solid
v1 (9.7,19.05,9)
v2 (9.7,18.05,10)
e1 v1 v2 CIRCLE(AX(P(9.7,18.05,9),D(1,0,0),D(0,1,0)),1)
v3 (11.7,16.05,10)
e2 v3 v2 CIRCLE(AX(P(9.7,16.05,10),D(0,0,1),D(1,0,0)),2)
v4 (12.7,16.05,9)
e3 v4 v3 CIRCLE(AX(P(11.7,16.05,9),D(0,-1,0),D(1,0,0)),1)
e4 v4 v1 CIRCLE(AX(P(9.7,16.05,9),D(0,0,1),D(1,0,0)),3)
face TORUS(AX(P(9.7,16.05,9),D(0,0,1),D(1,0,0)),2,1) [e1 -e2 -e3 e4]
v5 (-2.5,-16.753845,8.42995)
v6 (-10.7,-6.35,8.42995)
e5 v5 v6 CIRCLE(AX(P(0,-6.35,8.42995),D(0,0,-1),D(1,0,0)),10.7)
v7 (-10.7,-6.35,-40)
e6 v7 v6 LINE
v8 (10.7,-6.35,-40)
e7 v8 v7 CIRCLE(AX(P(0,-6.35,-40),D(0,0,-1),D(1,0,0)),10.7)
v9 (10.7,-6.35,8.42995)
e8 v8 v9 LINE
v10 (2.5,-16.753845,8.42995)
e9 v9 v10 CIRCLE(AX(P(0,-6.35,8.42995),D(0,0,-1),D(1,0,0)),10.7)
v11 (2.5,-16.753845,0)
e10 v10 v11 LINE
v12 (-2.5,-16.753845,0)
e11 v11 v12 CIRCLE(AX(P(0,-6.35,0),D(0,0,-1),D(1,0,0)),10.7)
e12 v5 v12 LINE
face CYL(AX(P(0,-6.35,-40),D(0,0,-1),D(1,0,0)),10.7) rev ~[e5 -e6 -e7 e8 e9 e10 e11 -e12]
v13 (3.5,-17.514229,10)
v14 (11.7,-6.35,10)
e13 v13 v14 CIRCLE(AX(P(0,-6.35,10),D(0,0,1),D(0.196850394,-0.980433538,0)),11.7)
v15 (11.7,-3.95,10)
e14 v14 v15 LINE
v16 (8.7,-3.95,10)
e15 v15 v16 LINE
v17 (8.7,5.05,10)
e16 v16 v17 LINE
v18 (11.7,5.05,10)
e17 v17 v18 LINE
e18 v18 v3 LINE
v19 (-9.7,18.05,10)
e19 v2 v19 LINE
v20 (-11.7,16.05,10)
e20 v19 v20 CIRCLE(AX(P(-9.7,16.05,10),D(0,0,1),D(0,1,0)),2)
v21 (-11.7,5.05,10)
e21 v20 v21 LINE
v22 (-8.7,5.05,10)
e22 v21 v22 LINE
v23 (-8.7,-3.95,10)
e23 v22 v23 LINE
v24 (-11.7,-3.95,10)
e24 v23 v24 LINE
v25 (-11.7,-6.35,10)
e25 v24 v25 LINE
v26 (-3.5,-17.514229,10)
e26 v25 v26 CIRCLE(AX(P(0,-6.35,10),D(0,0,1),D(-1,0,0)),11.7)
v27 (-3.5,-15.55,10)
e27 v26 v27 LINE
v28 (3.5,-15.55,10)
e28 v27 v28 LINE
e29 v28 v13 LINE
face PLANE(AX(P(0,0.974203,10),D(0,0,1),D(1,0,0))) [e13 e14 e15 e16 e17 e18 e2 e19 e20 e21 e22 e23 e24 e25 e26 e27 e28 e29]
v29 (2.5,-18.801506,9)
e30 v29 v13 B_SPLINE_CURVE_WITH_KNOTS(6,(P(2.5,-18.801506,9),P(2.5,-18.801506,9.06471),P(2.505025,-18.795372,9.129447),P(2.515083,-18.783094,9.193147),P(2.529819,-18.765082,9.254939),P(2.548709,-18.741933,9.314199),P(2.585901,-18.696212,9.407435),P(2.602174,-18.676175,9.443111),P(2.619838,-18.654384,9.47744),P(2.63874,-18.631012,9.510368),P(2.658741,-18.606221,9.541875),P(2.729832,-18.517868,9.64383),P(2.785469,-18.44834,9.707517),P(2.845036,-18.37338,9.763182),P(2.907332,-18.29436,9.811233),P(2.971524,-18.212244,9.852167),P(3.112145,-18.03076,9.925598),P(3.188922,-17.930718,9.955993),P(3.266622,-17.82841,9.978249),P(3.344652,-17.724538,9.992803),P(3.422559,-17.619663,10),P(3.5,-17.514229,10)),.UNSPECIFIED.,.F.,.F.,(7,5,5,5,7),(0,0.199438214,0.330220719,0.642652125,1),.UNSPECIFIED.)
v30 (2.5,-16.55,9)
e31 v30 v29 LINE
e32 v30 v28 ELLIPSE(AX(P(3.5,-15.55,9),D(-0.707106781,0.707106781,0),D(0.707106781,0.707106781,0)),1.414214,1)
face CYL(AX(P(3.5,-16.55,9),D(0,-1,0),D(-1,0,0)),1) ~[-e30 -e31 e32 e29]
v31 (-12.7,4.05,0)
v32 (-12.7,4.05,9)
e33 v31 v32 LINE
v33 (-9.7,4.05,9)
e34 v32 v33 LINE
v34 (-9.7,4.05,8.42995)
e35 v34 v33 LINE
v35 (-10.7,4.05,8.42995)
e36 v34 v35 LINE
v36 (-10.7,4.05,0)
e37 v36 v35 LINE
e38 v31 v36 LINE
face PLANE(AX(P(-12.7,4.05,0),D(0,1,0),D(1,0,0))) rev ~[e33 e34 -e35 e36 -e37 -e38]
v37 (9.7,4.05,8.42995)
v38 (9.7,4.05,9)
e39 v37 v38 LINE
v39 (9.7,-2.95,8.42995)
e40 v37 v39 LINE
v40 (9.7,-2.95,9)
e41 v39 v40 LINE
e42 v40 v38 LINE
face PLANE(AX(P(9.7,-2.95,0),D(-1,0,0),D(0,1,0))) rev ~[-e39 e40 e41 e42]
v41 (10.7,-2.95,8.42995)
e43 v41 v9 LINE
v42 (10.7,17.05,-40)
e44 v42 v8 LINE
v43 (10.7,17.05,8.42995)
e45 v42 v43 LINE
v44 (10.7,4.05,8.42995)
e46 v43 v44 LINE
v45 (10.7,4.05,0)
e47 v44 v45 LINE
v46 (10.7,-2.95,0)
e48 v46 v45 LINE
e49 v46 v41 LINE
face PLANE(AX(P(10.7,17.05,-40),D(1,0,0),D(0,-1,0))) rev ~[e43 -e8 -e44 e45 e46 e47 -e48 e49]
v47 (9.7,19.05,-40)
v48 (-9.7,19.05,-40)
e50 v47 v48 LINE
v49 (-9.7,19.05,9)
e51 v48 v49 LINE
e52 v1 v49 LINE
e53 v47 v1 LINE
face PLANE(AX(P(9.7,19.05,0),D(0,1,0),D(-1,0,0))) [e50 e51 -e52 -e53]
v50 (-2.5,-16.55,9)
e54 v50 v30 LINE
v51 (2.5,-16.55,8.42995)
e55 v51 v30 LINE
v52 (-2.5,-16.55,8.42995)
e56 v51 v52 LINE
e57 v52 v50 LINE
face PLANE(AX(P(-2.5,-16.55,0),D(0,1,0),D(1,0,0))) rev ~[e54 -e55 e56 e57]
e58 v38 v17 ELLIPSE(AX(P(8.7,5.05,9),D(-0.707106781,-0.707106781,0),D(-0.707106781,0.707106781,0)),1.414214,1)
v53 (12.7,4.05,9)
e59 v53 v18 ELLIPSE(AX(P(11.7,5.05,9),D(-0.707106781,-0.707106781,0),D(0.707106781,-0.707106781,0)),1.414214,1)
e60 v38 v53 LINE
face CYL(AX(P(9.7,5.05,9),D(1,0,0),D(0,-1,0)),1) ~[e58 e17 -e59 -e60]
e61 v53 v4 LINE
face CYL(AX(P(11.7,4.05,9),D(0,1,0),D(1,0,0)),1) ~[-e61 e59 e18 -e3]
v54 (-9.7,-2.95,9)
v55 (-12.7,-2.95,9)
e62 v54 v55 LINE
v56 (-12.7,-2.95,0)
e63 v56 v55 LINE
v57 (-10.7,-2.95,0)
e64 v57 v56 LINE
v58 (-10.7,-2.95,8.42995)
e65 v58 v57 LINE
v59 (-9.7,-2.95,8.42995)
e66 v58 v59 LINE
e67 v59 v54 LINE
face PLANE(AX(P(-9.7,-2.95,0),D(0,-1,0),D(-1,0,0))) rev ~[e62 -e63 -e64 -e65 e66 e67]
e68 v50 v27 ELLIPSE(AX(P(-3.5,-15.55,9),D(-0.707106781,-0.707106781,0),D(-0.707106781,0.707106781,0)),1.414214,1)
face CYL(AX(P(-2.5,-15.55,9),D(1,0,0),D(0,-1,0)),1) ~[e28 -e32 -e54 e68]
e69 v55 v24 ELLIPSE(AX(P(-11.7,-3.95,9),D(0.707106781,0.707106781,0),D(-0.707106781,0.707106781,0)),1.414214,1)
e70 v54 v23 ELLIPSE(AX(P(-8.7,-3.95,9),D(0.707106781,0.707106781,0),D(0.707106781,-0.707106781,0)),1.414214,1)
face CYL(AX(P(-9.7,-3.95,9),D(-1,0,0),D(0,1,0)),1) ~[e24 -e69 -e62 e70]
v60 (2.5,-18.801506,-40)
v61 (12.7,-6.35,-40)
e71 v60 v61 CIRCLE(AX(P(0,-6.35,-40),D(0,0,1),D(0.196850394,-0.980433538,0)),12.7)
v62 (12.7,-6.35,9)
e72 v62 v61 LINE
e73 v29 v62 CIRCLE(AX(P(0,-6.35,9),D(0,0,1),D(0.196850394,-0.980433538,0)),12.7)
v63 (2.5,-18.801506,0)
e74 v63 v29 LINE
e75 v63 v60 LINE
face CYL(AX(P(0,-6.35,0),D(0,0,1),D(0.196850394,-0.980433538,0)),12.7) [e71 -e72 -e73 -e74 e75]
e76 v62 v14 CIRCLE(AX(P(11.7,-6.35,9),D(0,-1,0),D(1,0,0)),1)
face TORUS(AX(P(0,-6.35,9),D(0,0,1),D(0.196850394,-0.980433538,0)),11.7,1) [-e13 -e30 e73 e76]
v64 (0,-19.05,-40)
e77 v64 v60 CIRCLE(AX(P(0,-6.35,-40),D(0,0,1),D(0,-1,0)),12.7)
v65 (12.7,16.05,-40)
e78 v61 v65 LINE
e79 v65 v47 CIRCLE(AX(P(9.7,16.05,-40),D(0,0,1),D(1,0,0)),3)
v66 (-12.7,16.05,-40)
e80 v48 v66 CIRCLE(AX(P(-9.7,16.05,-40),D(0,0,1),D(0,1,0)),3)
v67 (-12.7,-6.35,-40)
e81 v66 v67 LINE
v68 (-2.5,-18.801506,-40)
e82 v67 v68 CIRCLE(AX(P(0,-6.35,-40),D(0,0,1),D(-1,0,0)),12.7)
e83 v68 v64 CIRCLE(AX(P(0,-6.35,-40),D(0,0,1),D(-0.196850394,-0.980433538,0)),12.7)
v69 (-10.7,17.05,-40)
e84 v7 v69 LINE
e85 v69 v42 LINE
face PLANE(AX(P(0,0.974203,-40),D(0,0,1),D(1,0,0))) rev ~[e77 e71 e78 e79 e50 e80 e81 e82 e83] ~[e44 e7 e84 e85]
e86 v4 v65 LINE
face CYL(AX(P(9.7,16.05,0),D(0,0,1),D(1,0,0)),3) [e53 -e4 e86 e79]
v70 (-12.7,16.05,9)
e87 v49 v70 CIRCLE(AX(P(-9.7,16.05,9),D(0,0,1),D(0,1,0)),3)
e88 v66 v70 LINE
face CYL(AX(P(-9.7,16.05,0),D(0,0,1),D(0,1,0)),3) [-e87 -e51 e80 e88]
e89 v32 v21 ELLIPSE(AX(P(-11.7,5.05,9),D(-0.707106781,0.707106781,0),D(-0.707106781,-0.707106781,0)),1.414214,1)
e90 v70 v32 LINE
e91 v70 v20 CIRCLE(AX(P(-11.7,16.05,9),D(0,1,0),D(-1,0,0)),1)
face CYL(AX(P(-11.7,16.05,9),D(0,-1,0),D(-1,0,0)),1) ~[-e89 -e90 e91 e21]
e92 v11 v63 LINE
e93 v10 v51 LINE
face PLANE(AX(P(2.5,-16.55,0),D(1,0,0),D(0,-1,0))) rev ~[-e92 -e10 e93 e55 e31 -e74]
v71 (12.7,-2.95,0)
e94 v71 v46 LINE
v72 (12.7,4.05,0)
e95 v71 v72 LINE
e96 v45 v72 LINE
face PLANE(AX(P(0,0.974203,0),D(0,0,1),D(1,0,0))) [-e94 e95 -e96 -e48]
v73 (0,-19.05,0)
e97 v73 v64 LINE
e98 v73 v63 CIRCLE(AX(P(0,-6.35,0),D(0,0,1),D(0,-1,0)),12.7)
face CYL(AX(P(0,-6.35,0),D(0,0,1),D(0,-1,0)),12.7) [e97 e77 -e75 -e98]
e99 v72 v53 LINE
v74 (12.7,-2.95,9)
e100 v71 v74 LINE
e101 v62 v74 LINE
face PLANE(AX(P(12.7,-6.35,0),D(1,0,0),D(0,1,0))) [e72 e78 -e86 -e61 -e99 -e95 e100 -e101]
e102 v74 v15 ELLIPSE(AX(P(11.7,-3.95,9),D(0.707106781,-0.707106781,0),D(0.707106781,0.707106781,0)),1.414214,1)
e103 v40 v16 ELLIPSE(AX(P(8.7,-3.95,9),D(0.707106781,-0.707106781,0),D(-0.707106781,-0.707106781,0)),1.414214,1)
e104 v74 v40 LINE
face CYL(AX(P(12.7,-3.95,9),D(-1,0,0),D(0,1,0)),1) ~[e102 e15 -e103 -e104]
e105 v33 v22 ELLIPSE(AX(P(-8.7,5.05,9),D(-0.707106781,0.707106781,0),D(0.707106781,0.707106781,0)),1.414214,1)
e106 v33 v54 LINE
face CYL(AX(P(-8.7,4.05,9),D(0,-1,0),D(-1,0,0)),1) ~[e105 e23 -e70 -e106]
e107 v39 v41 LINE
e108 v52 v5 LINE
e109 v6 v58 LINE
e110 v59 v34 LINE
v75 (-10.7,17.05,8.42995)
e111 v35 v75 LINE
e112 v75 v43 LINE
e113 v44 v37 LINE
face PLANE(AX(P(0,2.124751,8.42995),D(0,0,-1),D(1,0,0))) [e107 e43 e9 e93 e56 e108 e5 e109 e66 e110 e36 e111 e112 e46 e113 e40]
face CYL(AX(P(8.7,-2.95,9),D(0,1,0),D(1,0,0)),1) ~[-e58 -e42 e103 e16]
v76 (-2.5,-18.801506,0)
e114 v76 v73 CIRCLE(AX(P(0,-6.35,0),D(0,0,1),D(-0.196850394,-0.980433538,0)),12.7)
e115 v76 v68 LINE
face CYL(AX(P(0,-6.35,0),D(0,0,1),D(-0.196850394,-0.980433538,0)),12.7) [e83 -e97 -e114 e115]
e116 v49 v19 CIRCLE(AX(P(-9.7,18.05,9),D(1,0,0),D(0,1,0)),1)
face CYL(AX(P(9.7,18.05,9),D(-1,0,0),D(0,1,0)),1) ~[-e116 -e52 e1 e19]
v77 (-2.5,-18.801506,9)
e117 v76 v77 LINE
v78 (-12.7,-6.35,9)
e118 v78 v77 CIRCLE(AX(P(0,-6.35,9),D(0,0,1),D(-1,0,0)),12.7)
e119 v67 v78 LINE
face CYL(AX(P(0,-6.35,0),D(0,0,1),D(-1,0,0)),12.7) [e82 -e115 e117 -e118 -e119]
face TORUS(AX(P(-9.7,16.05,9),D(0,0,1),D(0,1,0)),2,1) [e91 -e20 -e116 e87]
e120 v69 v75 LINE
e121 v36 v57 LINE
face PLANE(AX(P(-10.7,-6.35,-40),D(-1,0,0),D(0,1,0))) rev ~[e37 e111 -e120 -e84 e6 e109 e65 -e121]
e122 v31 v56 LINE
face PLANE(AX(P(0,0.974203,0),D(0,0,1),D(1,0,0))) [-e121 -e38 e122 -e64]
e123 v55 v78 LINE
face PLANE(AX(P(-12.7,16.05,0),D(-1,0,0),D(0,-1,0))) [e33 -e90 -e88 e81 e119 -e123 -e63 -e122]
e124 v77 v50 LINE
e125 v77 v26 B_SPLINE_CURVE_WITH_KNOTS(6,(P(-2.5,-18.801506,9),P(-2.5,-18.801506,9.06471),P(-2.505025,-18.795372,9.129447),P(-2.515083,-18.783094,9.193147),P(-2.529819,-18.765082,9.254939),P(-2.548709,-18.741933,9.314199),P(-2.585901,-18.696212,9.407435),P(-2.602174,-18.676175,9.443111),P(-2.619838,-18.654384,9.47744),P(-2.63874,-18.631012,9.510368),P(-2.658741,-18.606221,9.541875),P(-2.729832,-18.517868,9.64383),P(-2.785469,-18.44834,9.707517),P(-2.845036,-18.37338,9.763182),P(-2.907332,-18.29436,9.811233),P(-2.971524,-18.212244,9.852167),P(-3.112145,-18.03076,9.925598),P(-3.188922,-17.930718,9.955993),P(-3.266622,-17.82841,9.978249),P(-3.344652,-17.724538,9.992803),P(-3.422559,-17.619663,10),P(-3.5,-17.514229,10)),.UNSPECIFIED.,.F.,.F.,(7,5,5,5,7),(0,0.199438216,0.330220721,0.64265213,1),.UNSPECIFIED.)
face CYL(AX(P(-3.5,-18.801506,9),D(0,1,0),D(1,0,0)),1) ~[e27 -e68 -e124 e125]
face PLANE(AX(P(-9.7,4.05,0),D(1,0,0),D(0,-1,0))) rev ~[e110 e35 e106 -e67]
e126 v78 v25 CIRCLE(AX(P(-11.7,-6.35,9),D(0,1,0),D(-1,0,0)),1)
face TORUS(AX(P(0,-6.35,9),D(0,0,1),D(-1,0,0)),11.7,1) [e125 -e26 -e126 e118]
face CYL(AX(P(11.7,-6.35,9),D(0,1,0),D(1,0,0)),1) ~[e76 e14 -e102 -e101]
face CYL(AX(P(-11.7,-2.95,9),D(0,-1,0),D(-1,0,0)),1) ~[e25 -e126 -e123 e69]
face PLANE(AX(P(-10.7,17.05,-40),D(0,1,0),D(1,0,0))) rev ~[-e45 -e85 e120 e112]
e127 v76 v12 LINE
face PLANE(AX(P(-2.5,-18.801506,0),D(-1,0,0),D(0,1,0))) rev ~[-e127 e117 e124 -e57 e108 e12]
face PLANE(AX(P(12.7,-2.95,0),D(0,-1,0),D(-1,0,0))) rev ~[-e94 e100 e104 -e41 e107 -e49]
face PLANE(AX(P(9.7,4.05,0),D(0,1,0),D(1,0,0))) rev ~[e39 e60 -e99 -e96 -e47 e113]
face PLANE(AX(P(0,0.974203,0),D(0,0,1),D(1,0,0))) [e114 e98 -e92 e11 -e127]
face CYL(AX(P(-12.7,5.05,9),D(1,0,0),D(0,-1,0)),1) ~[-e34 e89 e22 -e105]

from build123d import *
from build123d import SkipClean  # not in build123d's __all__

# Parameters (mm, degrees)
F1_DEPTH = 10
F0_W     = 3
F0_H     = 7
F2_DEPTH = 40
F4_DEPTH = 48.42995
F5_R     = 1


# Not quite as in the source:
# - after a boolean that leaves OpenCascade's solid faulty, fix() repairs it


with BuildPart() as f1:
    # F0 (on Top) → F1 (new body)
    with BuildSketch(Plane.XY):
        with BuildLine():
            ThreePointArc((12.7, 16.05), (11.8213203436, 18.1713203436), (9.7, 19.05))
            Line((9.7, 19.05), (-9.7, 19.05))
            ThreePointArc((-9.7, 19.05), (-11.8213203436, 18.1713203436), (-12.7, 16.05))
            Line((-12.7, 16.05), (-12.7, 4.05))
            Line((-12.7, 4.05), (-9.7, 4.05))
            Line((-9.7, 4.05), (-9.7, -2.95))
            Line((-9.7, -2.95), (-12.7, -2.95))
            Line((-12.7, -2.95), (-12.7, -6.35))
            ThreePointArc((-12.7, -6.35), (-9.8244592727, -14.3979811133), (-2.5, -18.801505933))
            Line((-2.5, -18.801505933), (-2.5, -16.55))
            Line((-2.5, -16.55), (2.5, -16.55))
            Line((2.5, -16.55), (2.5, -18.801505933))
            ThreePointArc((2.5, -18.801505933), (9.8244592727, -14.3979811133), (12.7, -6.35))
            Line((12.7, -6.35), (12.7, -2.95))
            Line((12.7, -2.95), (9.7, -2.95))
            Line((9.7, -2.95), (9.7, 4.05))
            Line((9.7, 4.05), (12.7, 4.05))
            Line((12.7, 4.05), (12.7, 16.05))
        make_face()
    extrude(amount=F1_DEPTH)

    # F0 (on Top) → F2 (join)
    with BuildSketch(Plane.XY):
        with BuildLine():
            ThreePointArc((12.7, 16.05), (11.8213203436, 18.1713203436), (9.7, 19.05))
            Line((9.7, 19.05), (-9.7, 19.05))
            ThreePointArc((-9.7, 19.05), (-11.8213203436, 18.1713203436), (-12.7, 16.05))
            Line((-12.7, 16.05), (-12.7, 4.05))
            Line((-12.7, 4.05), (-9.7, 4.05))
            Line((-9.7, 4.05), (-9.7, -2.95))
            Line((-9.7, -2.95), (-12.7, -2.95))
            Line((-12.7, -2.95), (-12.7, -6.35))
            ThreePointArc((-12.7, -6.35), (-9.8244592727, -14.3979811133), (-2.5, -18.801505933))
            Line((-2.5, -18.801505933), (-2.5, -16.55))
            Line((-2.5, -16.55), (2.5, -16.55))
            Line((2.5, -16.55), (2.5, -18.801505933))
            ThreePointArc((2.5, -18.801505933), (9.8244592727, -14.3979811133), (12.7, -6.35))
            Line((12.7, -6.35), (12.7, -2.95))
            Line((12.7, -2.95), (9.7, -2.95))
            Line((9.7, -2.95), (9.7, 4.05))
            Line((9.7, 4.05), (12.7, 4.05))
            Line((12.7, 4.05), (12.7, 16.05))
        make_face()
        with Locations((11.2, 0.55)):
            Rectangle(F0_W, F0_H)
        with BuildLine():
            ThreePointArc((0, -19.05), (1.2561597531, -18.9877237933), (2.5, -18.801505933))
            Line((2.5, -18.801505933), (2.5, -16.55))
            Line((2.5, -16.55), (-2.5, -16.55))
            Line((-2.5, -16.55), (-2.5, -18.801505933))
            ThreePointArc((-2.5, -18.801505933), (-1.2561597531, -18.9877237933), (0, -19.05))
        make_face()
        with Locations((-11.2, 0.55)):
            Rectangle(F0_W, F0_H)
    with SkipClean():  # cleaning this boolean's faces spoils the solid; the shape is the same uncleaned
        extrude(amount=-F2_DEPTH)

    # F3 (on face) → F4 (cut)
    with BuildSketch(Plane(origin=(0, 0, -40), x_dir=(1, 0, 0), z_dir=(0, 0, -1))):
        with BuildLine():
            ThreePointArc((10.7, 6.35), (0, 17.05), (-10.7, 6.35))
            Line((-10.7, 6.35), (-10.7, -17.05))
            Line((-10.7, -17.05), (10.7, -17.05))
            Line((10.7, -17.05), (10.7, 6.35))
        make_face()
    extrude(amount=-F4_DEPTH, mode=Mode.SUBTRACT)

    add(f1.part.fix(), mode=Mode.REPLACE)

    # F5
    f5_edges = [f1.edges().sort_by_distance(p)[0] for p in [
        (9.824459, -14.397981, 10),
        (12.7, -4.65, 10),
        (11.2, -2.95, 10),
        (9.7, 0.55, 10),
        (11.2, 4.05, 10),
        (12.7, 10.05, 10),
        (11.82132, 18.17132, 10),
        (0, 19.05, 10),
        (-11.82132, 18.17132, 10),
        (-12.7, 10.05, 10),
        (-11.2, 4.05, 10),
        (-9.7, 0.55, 10),
        (-11.2, -2.95, 10),
        (-12.7, -4.65, 10),
        (-9.824459, -14.397981, 10),
        (-2.5, -17.675753, 10),
        (0, -16.55, 10),
        (2.5, -17.675753, 10),
    ]]
    fillet(f5_edges, radius=F5_R)


solid = f1.part
